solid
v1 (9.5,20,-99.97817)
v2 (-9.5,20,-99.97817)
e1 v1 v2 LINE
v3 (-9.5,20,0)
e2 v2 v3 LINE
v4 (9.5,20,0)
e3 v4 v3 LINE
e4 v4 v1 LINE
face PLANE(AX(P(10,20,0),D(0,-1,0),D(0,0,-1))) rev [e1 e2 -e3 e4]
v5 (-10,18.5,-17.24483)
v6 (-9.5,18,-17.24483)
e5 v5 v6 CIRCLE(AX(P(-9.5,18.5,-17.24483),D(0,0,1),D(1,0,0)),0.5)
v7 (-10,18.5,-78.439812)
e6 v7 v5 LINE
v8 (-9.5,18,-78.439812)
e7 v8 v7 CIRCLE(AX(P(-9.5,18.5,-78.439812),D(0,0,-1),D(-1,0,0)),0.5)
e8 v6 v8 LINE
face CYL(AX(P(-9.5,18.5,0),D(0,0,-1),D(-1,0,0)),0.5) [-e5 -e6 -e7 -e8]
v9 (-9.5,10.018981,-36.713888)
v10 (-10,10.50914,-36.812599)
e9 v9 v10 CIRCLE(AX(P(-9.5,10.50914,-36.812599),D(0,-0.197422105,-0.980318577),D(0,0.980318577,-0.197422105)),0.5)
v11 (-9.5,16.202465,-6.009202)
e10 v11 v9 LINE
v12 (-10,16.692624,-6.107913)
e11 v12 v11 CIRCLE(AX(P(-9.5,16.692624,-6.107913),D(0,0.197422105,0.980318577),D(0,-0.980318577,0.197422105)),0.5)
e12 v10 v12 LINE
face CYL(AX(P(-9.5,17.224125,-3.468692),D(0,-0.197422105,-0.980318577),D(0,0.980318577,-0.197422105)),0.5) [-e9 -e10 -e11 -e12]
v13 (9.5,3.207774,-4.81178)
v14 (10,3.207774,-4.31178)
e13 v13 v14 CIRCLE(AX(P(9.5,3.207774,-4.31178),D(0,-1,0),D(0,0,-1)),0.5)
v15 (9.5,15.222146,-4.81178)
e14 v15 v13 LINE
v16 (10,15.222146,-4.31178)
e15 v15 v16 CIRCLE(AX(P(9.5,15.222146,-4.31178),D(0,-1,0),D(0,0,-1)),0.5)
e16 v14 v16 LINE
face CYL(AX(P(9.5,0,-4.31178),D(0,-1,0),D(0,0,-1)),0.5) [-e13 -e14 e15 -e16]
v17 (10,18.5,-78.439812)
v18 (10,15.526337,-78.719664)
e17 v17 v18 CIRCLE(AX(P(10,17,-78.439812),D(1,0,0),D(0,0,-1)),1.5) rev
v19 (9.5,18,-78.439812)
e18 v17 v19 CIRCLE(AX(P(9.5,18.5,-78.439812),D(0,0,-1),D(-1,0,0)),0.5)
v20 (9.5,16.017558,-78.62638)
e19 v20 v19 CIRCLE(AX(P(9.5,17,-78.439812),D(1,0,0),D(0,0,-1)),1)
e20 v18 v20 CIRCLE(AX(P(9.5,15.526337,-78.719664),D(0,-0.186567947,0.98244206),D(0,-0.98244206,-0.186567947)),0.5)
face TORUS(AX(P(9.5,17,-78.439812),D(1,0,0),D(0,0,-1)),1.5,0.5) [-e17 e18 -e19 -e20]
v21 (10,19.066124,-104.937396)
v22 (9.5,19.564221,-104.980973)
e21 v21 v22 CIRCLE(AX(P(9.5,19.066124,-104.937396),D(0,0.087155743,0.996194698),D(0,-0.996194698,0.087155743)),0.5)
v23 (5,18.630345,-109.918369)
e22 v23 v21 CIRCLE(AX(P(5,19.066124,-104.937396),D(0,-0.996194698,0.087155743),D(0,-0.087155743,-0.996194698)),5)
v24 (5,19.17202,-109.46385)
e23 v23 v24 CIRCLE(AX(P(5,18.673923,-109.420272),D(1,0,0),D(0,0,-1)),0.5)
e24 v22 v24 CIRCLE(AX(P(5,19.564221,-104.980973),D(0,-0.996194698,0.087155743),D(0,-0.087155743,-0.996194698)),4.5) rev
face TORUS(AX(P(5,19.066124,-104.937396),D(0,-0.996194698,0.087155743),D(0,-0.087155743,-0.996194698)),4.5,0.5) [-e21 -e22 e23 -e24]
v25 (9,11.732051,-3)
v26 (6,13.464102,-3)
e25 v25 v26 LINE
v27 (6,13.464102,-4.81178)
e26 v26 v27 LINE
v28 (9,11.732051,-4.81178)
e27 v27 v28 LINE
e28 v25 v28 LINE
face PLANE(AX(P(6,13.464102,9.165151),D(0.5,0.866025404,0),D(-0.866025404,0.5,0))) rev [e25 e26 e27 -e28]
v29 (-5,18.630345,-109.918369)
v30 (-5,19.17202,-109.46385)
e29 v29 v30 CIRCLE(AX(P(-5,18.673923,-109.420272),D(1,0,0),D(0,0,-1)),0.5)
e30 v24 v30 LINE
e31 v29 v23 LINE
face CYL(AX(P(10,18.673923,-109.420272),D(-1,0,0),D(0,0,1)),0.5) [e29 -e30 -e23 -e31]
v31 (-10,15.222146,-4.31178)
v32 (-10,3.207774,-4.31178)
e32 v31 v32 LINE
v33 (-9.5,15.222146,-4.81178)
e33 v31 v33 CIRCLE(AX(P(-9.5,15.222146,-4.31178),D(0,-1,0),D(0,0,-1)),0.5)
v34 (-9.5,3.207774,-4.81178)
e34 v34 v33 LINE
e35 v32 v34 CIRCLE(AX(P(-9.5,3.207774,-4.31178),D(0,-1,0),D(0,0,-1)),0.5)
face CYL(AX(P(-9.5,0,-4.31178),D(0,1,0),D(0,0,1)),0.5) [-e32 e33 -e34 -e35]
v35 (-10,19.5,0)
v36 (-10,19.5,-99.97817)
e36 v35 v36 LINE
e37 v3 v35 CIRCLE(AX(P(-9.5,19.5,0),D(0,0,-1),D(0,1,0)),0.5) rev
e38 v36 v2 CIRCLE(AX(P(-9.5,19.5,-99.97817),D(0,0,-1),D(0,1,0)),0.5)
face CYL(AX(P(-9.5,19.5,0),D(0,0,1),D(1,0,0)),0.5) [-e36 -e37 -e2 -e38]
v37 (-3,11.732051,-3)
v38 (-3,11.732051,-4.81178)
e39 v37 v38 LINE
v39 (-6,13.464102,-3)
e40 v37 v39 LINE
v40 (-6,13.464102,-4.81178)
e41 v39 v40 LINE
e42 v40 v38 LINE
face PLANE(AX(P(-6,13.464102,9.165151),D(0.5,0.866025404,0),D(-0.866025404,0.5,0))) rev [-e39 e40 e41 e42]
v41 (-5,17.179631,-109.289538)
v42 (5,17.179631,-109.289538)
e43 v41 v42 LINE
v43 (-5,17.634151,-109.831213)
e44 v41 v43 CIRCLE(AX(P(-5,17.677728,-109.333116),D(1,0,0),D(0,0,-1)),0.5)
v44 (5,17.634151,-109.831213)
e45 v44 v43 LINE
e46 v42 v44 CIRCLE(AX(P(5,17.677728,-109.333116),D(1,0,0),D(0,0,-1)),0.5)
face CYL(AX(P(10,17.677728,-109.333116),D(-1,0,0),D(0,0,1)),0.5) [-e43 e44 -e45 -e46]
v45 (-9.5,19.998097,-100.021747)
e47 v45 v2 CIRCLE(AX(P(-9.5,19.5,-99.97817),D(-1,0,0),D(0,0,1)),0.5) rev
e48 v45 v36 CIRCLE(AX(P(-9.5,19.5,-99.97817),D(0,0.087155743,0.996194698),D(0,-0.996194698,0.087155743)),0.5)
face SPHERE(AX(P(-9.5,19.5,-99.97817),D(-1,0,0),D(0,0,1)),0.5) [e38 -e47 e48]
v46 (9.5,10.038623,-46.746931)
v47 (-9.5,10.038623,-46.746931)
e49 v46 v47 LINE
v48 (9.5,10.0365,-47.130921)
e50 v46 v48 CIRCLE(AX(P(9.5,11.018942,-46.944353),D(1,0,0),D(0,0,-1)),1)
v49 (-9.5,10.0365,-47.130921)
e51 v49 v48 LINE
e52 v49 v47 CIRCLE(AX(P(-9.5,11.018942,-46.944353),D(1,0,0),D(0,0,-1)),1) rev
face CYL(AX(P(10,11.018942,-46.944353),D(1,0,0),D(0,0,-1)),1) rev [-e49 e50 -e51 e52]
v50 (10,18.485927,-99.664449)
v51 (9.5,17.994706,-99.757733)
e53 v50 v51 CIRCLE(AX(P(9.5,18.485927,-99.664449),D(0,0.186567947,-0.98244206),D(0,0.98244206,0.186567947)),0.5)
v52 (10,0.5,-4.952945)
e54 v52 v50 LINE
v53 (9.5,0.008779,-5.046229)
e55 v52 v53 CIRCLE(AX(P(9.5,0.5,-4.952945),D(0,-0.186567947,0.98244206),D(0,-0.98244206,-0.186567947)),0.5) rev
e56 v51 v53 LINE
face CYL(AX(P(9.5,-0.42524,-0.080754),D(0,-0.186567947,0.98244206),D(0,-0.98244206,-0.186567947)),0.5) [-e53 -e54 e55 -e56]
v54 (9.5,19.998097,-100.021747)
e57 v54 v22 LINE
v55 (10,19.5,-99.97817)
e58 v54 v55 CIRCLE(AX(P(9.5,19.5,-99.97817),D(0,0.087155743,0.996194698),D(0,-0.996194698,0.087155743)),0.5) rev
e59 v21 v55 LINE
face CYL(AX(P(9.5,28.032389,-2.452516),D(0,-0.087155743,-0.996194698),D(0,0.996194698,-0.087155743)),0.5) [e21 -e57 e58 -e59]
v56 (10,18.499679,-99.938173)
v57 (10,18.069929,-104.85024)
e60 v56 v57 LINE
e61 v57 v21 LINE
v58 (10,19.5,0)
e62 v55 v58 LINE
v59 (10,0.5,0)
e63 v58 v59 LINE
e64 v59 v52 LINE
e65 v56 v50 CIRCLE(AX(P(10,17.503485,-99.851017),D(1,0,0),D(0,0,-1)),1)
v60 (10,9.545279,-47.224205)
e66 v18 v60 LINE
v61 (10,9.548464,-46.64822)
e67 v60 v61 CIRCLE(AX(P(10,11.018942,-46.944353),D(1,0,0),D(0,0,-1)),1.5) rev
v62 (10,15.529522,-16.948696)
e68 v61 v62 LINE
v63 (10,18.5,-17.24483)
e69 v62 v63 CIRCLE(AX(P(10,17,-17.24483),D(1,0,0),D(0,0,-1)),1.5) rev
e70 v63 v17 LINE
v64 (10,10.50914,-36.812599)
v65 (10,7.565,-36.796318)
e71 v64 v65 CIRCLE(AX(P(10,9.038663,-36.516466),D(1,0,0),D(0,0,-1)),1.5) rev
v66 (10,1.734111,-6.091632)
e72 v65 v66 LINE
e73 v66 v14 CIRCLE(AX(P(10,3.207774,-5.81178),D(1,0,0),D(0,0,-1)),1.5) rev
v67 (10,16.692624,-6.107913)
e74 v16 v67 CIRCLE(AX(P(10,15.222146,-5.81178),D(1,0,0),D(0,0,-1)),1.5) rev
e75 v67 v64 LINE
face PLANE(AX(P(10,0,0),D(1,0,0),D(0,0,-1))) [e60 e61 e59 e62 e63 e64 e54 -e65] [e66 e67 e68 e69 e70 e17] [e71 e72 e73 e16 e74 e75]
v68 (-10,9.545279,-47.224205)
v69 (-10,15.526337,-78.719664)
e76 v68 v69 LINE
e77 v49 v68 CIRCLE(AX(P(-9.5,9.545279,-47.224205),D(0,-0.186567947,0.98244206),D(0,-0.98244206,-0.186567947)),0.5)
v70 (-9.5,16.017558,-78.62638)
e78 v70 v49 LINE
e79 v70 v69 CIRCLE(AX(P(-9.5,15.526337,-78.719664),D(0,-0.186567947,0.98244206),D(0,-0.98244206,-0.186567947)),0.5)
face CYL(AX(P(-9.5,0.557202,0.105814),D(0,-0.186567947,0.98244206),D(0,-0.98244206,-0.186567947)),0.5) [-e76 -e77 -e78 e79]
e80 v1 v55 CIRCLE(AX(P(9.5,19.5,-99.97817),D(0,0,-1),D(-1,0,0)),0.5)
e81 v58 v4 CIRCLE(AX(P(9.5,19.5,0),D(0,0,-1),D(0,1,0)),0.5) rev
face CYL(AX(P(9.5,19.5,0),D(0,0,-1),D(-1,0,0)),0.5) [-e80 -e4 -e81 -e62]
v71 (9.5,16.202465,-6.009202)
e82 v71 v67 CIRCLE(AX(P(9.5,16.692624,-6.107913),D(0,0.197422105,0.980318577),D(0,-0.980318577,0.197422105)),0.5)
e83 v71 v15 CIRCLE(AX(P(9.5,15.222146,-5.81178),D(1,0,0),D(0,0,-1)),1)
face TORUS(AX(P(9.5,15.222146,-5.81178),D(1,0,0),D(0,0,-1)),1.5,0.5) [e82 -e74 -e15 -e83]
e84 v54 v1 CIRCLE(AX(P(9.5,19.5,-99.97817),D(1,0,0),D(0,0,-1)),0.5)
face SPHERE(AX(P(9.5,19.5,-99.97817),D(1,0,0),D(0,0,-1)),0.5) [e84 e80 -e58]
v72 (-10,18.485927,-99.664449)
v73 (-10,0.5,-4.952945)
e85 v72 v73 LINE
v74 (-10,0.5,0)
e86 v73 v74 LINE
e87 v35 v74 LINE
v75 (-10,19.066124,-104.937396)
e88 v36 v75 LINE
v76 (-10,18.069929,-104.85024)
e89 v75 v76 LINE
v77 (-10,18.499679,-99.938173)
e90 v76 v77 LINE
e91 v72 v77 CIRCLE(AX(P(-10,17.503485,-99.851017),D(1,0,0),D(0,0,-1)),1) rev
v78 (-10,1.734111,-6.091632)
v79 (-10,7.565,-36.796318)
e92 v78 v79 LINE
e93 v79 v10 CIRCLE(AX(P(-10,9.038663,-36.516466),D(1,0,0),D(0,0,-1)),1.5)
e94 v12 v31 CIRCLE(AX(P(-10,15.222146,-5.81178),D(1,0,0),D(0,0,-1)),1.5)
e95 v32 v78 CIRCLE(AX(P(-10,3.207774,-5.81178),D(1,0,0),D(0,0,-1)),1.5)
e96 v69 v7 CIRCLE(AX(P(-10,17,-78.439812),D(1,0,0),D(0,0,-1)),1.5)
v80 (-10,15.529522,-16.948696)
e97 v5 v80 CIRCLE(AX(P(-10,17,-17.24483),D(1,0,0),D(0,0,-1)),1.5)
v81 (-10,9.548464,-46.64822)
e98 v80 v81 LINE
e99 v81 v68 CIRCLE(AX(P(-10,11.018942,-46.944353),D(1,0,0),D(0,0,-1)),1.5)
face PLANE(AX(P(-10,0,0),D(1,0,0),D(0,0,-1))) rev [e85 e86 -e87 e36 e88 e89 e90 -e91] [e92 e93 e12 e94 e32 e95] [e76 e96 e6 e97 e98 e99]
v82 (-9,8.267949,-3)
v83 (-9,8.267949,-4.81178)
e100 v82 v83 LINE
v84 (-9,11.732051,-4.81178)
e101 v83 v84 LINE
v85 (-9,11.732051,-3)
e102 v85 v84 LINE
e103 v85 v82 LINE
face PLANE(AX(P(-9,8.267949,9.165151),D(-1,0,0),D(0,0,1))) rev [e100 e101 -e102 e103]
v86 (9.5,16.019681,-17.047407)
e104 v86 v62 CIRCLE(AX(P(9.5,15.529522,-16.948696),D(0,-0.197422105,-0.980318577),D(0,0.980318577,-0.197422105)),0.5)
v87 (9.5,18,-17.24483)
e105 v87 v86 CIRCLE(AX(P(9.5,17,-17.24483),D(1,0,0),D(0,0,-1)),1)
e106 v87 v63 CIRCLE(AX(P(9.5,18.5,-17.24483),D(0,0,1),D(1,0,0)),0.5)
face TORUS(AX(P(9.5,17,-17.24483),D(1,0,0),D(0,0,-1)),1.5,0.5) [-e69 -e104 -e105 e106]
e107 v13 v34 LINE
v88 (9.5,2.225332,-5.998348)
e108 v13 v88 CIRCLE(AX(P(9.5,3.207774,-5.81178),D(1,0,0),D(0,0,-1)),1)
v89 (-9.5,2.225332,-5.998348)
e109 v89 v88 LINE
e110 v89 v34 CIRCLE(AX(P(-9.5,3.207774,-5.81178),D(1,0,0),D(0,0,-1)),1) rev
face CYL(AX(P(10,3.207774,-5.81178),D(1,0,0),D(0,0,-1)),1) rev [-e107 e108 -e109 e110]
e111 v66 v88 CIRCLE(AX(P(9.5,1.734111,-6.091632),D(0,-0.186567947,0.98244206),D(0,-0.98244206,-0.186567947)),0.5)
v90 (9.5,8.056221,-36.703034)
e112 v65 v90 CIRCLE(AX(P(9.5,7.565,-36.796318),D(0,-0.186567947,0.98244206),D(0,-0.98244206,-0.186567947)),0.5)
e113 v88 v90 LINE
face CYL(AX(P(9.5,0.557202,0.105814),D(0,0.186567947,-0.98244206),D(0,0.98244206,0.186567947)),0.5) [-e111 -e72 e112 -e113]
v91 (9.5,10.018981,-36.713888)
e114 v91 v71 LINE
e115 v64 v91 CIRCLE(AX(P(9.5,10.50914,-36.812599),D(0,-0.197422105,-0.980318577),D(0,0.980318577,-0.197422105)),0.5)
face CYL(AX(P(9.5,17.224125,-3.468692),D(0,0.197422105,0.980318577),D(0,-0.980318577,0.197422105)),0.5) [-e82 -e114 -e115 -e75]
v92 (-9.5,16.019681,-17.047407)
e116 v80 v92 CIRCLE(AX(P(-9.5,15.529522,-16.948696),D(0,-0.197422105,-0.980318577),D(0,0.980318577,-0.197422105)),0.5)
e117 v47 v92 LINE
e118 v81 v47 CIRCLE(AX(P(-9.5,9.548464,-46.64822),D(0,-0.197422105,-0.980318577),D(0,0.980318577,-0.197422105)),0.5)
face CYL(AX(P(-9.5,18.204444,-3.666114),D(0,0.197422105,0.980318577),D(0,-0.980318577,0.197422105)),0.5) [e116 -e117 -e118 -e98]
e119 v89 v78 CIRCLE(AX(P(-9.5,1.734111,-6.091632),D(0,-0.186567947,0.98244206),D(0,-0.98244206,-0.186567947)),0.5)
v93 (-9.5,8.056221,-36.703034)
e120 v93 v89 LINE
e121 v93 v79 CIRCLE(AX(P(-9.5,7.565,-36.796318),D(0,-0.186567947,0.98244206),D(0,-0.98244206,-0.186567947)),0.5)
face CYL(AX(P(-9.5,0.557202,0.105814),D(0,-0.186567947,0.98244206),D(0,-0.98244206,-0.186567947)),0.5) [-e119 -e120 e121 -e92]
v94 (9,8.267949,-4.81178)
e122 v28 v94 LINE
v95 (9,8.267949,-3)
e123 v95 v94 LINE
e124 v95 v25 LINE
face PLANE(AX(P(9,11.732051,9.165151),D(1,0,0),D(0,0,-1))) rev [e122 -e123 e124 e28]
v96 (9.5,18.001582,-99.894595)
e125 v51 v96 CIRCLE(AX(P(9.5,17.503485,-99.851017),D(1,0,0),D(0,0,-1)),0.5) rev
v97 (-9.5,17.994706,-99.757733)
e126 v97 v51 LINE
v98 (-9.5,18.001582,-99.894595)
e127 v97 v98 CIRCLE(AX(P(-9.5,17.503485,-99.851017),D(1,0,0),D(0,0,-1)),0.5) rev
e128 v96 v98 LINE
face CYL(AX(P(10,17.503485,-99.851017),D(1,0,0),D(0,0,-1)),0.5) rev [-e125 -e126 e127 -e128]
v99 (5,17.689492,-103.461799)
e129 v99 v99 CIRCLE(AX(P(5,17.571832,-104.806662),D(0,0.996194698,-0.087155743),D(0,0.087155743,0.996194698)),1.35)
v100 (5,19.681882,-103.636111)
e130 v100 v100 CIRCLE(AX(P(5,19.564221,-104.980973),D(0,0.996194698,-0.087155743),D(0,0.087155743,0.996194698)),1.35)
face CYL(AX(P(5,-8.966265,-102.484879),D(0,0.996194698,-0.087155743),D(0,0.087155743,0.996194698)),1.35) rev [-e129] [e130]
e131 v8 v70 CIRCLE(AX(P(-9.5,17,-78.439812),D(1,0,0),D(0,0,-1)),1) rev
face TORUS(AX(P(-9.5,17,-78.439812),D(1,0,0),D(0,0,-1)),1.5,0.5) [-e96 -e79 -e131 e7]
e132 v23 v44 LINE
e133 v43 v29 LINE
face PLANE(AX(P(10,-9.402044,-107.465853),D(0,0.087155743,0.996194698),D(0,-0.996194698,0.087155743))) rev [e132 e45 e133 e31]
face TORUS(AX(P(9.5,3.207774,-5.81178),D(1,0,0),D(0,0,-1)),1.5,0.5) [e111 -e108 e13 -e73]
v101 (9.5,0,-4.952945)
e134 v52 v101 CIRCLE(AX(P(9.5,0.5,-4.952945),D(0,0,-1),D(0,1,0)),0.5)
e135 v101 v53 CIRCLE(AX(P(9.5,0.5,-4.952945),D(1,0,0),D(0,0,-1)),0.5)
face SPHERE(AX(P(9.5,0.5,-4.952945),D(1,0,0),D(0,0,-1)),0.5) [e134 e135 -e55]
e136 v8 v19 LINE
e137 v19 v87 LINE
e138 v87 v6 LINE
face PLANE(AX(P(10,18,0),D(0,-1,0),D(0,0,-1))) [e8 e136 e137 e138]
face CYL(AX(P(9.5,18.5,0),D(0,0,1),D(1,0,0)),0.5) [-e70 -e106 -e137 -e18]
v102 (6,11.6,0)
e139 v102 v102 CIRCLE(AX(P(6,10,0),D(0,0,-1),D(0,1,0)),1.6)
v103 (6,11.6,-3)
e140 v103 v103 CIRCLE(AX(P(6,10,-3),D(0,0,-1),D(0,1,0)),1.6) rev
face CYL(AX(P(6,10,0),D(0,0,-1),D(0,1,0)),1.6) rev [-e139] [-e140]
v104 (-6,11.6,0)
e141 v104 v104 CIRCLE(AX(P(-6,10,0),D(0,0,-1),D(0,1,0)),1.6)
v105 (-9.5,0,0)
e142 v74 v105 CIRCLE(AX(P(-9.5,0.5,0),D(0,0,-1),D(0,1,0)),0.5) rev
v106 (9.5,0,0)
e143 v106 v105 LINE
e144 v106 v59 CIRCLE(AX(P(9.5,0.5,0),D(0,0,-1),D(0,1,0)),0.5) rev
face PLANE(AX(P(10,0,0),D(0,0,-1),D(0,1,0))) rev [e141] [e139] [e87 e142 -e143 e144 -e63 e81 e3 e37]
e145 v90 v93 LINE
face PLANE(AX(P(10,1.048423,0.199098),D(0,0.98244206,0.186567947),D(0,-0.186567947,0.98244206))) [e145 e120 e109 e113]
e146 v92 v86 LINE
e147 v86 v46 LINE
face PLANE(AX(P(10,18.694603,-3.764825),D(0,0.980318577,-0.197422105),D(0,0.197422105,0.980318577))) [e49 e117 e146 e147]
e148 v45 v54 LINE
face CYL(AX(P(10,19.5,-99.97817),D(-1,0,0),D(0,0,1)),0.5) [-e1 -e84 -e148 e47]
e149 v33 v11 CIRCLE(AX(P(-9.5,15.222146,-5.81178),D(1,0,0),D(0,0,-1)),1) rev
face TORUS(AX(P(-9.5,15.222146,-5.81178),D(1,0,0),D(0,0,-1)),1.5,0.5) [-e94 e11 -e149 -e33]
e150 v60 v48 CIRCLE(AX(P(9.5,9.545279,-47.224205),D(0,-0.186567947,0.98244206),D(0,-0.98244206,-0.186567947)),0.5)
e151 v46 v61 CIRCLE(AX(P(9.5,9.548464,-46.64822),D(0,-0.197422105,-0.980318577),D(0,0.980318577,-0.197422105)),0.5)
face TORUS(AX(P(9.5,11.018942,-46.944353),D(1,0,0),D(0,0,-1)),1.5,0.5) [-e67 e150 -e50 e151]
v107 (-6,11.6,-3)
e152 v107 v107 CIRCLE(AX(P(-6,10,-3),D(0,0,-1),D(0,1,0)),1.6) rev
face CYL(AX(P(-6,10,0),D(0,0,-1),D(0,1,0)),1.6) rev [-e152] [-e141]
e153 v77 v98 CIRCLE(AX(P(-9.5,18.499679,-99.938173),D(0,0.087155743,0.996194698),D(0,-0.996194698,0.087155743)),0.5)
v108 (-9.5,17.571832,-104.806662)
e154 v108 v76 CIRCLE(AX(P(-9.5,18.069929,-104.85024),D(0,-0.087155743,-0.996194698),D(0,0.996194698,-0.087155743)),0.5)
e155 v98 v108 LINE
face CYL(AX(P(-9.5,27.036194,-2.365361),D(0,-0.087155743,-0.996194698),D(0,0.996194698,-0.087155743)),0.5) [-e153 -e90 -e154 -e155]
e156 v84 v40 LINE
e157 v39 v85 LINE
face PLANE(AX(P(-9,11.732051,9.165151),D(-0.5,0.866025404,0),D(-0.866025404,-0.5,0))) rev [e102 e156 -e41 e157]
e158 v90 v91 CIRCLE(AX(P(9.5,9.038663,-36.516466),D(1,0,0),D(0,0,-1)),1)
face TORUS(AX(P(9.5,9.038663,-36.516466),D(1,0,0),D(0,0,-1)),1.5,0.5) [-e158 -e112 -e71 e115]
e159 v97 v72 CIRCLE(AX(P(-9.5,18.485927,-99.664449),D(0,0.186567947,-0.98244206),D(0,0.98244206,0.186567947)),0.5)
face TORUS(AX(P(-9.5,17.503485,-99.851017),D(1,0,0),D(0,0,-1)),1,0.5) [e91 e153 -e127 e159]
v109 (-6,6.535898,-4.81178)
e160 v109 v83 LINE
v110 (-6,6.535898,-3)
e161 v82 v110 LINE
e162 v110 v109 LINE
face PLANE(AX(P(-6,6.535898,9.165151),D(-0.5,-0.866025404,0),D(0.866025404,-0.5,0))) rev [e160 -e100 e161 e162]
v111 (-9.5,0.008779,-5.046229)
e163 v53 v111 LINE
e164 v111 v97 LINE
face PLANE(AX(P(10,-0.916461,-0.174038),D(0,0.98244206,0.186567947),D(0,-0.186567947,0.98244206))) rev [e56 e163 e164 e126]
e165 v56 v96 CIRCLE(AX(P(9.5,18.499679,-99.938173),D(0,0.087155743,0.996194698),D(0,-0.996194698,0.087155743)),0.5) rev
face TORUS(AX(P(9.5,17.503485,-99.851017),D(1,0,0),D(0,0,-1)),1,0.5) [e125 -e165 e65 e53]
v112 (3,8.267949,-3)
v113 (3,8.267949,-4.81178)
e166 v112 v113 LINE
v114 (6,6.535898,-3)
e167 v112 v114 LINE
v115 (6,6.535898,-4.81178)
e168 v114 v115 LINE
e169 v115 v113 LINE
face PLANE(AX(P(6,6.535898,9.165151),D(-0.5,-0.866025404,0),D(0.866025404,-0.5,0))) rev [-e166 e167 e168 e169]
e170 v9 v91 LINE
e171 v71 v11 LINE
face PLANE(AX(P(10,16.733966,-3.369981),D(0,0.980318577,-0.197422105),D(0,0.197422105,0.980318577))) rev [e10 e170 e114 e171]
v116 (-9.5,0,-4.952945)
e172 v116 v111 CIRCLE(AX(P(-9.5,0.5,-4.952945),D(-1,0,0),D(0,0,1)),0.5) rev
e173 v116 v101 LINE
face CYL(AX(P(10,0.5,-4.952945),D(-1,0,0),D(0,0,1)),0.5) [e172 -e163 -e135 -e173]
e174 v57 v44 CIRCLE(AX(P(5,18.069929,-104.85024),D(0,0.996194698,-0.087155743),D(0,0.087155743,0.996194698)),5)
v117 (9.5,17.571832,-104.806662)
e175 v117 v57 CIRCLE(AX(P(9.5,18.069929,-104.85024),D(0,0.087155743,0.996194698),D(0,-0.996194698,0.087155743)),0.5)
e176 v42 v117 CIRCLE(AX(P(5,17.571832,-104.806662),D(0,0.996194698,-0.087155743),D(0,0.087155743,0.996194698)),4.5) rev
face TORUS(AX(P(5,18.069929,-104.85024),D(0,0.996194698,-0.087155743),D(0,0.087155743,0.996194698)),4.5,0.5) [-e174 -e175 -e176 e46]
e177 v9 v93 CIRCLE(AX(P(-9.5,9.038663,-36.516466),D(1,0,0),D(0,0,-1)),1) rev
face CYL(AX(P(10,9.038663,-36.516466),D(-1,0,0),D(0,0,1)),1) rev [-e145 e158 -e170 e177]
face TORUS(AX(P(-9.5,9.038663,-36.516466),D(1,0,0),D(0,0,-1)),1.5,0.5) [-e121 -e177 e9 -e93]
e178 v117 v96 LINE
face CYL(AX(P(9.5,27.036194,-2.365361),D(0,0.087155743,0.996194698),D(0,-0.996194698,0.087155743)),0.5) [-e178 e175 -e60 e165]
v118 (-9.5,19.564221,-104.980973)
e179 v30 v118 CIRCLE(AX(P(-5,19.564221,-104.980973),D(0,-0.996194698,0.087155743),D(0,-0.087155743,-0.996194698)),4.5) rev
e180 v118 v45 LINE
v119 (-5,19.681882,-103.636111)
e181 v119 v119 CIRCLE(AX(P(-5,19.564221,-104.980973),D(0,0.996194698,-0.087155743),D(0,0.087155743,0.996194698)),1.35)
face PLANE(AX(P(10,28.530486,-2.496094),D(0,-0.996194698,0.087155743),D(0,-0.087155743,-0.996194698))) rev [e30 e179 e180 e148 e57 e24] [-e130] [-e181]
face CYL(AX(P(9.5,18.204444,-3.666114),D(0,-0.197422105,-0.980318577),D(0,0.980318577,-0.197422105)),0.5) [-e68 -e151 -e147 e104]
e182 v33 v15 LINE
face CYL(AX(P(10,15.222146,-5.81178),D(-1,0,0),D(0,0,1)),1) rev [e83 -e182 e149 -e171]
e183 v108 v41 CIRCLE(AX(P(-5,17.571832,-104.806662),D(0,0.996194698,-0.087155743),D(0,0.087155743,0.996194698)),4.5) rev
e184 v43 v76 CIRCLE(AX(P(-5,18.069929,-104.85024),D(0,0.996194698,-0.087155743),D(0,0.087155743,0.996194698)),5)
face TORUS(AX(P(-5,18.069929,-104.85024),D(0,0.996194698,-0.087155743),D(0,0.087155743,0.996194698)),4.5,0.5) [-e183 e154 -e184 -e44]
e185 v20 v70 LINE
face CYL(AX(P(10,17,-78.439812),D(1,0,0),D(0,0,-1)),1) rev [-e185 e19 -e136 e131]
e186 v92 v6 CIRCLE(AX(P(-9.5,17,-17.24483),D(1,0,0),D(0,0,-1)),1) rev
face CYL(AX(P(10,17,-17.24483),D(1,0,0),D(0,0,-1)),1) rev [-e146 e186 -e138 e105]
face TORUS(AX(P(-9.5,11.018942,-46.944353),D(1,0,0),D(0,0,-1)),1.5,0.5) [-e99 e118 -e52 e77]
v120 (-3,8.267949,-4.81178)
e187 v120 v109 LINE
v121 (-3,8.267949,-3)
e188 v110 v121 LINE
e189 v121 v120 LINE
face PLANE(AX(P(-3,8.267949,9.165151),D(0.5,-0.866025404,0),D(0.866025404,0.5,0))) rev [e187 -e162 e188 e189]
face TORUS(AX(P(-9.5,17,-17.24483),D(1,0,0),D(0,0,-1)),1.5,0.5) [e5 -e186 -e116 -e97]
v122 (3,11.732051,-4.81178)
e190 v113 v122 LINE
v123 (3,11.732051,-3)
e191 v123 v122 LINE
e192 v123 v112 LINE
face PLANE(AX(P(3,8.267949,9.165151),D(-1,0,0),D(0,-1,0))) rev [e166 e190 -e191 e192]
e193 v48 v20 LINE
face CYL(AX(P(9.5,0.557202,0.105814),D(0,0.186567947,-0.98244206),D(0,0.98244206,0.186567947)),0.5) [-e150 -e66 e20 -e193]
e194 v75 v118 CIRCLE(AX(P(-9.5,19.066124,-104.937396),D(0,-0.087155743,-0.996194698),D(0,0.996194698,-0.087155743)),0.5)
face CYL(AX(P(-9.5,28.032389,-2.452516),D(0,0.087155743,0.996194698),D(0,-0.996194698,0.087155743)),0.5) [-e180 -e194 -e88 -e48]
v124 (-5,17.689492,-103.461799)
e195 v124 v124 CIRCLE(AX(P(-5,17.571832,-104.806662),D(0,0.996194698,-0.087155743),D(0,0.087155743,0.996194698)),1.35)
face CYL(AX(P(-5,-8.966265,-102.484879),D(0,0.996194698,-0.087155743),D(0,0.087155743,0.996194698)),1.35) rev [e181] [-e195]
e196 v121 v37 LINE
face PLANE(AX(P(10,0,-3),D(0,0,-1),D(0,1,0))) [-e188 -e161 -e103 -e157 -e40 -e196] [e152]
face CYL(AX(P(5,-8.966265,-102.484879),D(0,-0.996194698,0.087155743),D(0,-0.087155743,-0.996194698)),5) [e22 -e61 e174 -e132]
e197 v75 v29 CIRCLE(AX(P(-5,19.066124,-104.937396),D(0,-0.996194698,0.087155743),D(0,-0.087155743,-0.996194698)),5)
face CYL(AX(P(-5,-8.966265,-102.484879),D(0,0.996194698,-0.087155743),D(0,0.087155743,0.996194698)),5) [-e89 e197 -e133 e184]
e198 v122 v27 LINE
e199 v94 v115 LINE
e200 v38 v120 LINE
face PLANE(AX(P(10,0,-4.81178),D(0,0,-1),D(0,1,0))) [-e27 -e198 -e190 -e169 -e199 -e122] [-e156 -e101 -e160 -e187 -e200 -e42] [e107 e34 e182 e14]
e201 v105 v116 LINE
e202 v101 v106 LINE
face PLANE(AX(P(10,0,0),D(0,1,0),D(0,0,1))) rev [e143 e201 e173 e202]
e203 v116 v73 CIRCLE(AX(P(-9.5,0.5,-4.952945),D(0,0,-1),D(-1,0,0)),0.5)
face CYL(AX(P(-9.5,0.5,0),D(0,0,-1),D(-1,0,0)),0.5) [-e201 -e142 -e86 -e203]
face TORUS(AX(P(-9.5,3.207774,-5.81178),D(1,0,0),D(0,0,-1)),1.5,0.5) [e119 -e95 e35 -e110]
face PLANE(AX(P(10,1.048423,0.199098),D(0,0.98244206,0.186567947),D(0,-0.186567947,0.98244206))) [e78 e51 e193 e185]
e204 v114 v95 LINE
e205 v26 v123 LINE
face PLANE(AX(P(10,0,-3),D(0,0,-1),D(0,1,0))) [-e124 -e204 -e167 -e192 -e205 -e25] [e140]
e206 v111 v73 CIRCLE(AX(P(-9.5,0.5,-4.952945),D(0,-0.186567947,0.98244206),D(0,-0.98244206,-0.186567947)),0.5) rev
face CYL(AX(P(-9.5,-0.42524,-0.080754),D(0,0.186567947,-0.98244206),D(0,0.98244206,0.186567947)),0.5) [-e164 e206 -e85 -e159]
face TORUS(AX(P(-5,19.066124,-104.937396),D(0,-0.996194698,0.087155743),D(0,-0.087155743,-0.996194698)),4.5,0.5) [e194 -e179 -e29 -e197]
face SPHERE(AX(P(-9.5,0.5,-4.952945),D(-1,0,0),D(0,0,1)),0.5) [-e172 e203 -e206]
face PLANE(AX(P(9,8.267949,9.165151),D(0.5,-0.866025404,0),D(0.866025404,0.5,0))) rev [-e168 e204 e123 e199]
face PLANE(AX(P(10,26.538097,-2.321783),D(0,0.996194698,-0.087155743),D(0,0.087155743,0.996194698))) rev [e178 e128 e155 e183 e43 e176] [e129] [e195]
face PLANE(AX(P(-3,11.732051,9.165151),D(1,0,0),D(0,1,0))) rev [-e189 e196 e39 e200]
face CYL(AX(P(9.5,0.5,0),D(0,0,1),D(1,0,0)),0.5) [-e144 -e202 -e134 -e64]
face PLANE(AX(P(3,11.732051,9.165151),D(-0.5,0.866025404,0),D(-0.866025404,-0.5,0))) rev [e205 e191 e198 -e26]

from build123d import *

# Parameters (mm, degrees)
BOSS_EXTRUDE1_DEPTH = 10
FILLET1_R           = 1
SKETCH2_R           = 1.350000000000004
CUT_EXTRUDE1_DEPTH  = 112.63735120832646
FILLET2_R           = 5
FILLET3_R           = 0.5
SKETCH3_R           = 1.6
CUT_EXTRUDE2_DEPTH  = 108.46066783767205
SKETCH3_3_R         = 1.6
CUT_EXTRUDE3_DEPTH  = 1.811779672


with BuildPart() as part:
    # Sketch1 → Boss-Extrude1 (new, symmetric)
    with BuildSketch(Plane(origin=(0, 0, 0), x_dir=(0, 0, -1), z_dir=(1, 0, 0))):
        Polygon((5, 0), (99.82568851450469, 18.00761060381651), (109.78763549542214, 17.136053176339928), (109.96194698091746, 19.128442572523415), (100, 20), (0, 20), (0, 0), align=None)
        Polygon((7.213943781132286, 18.000000000000004), (89.06565708049523, 18.000000000000004), (46.93871837629756, 10), align=None, mode=Mode.SUBTRACT)
        Polygon((4.811779672099927, 2), (4.811779672099926, 16.443608291167273), (41.724774595165265, 9.00986039973272), align=None, mode=Mode.SUBTRACT)
    extrude(amount=BOSS_EXTRUDE1_DEPTH, both=True)

    # Fillet1
    fillet1_edges = [part.edges().sort_by_distance(p)[0] for p in [
        (0, 10, -46.93871837629756),
        (0, 18.000000000000004, -89.06565708049523),
        (0, 18, -7.213943781132289),
        (0, 2, -4.811779672099927),
        (0, 9.009860399732721, -41.72477459516527),
        (0, 16.443608291167273, -4.811779672099927),
    ]]
    fillet(fillet1_edges, radius=FILLET1_R)

    # Sketch2 → Cut-Extrude1 (cut, through all)
    with BuildSketch(Plane(origin=(0, 28.530486413468626, -2.4960941260589085), x_dir=(1, 0, 0), z_dir=(0, 0.9961946980917455, -0.08715574274765775))):
        with Locations(Location((-5.000000000000002, 102.87635495422138, 0), (0, 0, 270))):
            Circle(SKETCH2_R)
        with Locations(Location((4.999999999999998, 102.87635495422138, 0), (0, 0, 270))):
            Circle(SKETCH2_R)
    extrude(amount=-CUT_EXTRUDE1_DEPTH, mode=Mode.SUBTRACT)

    # Fillet2
    fillet2_edges = [part.edges().sort_by_distance(p)[0] for p in [
        (-10, 18.13224787443167, -109.87479123816979),
        (10, 18.13224787443167, -109.87479123816979),
    ]]
    fillet(fillet2_edges, radius=FILLET2_R)

    # Fillet3
    # the kernel refuses this fillet: 0.5 mm, written as the material it adds along each edge
    with BuildSketch(Plane(origin=(-10, 18.00761060381651, -99.82568851450469), x_dir=(0, -0.08715574274767855, -0.9961946980917438), z_dir=(1, 0, 0))) as fillet3_piece_1:
        with BuildLine():
            CenterArc((FILLET3_R * 0.138339535501, -FILLET3_R), FILLET3_R, 90.00000000000139, 15.752560883569203)
            Line((-FILLET3_R * 0.133143931847, -FILLET3_R * 0.0375568967694), (0, 0))
            Line((0, 0), (FILLET3_R * 0.138339535501, 0))
        make_face()
    extrude(amount=20)
    # the kernel refuses this fillet: 0.5 mm, written as the material it takes off along each edge
    with BuildSketch(Plane(origin=(-9.5, 19.5, -99.97816952854573), x_dir=(0, 0.9961946980917455, -0.08715574274765844), z_dir=(-1, 0, 0))) as fillet3_2_piece_1_section:
        Polygon((0, 0), (FILLET3_R, 0), (FILLET3_R, -FILLET3_R * 0.0436609429085), (FILLET3_R * 0.996194698092, -FILLET3_R * 0.0871557427477), align=None)
    fillet3_2_piece_1 = extrude(amount=FILLET3_R, mode=Mode.PRIVATE)
    fillet3_2_piece_1 = fillet3_2_piece_1 - Plane(origin=(-9.5, 19.5, -99.97816952854573), x_dir=(0, -0.9990482215818577, 0.04361938736533613), z_dir=(-1, 0, 0)) * Sphere(FILLET3_R, mode=Mode.PRIVATE)
    add(fillet3_2_piece_1, mode=Mode.SUBTRACT)
    with BuildSketch(Plane(origin=(-9.5, 0.5000000000000001, -4.952944918024983), x_dir=(0, -0.9824420598938401, -0.18656794727805787), z_dir=(-1, 0, 0))) as fillet3_2_piece_2_section:
        Polygon((0, 0), (FILLET3_R, 0), (FILLET3_R, FILLET3_R * 0.09411016395), (FILLET3_R * 0.982442059894, FILLET3_R * 0.186567947278), align=None)
    fillet3_2_piece_2 = extrude(amount=FILLET3_R, mode=Mode.PRIVATE)
    fillet3_2_piece_2 = fillet3_2_piece_2 - Plane(origin=(-9.5, 0.5000000000000001, -4.952944918024983), x_dir=(0, 0.9956008386632266, 0.09369615815539034), z_dir=(-1, 0, 0)) * Sphere(FILLET3_R, mode=Mode.PRIVATE)
    add(fillet3_2_piece_2, mode=Mode.SUBTRACT)
    with BuildSketch(Plane(origin=(9.5, 19.5, -99.97816952854575), x_dir=(0, 0.9961946980917455, -0.08715574274765844), z_dir=(1, 0, 0))) as fillet3_2_piece_3_section:
        Polygon((0, 0), (FILLET3_R, 0), (FILLET3_R, FILLET3_R * 0.0436609429085), (FILLET3_R * 0.996194698092, FILLET3_R * 0.0871557427477), align=None)
    fillet3_2_piece_3 = extrude(amount=FILLET3_R, mode=Mode.PRIVATE)
    fillet3_2_piece_3 = fillet3_2_piece_3 - Plane(origin=(9.5, 19.5, -99.97816952854575), x_dir=(0, -0.9990482215818577, 0.04361938736533613), z_dir=(1, 0, 0)) * Sphere(FILLET3_R, mode=Mode.PRIVATE)
    add(fillet3_2_piece_3, mode=Mode.SUBTRACT)
    with BuildSketch(Plane(origin=(9.5, 0.5, -4.952944918024983), x_dir=(0, -0.9824420598938401, -0.18656794727805787), z_dir=(1, 0, 0))) as fillet3_2_piece_4_section:
        Polygon((0, 0), (FILLET3_R, 0), (FILLET3_R, -FILLET3_R * 0.09411016395), (FILLET3_R * 0.982442059894, -FILLET3_R * 0.186567947278), align=None)
    fillet3_2_piece_4 = extrude(amount=FILLET3_R, mode=Mode.PRIVATE)
    fillet3_2_piece_4 = fillet3_2_piece_4 - Plane(origin=(9.5, 0.5, -4.952944918024983), x_dir=(0, 0.9956008386632266, 0.09369615815539034), z_dir=(1, 0, 0)) * Sphere(FILLET3_R, mode=Mode.PRIVATE)
    add(fillet3_2_piece_4, mode=Mode.SUBTRACT)
    with BuildSketch(Plane(origin=(-10, 20, -99.97816952854573), x_dir=(1, 0, 0), z_dir=(0, 0, 1))) as fillet3_2_piece_5:
        with BuildLine():
            CenterArc((FILLET3_R, -FILLET3_R), FILLET3_R, 90, 90)
            Line((0, -FILLET3_R), (0, 0))
            Line((0, 0), (FILLET3_R, 0))
        make_face()
    extrude(amount=101.22816952854573, mode=Mode.SUBTRACT)
    with BuildSketch(Plane(origin=(-10, 18.001582061332513, -99.89459507040617), x_dir=(1, 0, 0), z_dir=(0, -0.08715574274765822, -0.9961946980917455))) as fillet3_2_piece_6:
        with BuildLine():
            CenterArc((FILLET3_R, -FILLET3_R), FILLET3_R, 90, 90)
            Line((0, -FILLET3_R), (0, 0))
            Line((0, 0), (FILLET3_R, 0))
        make_face()
    extrude(amount=4.930830232249302, mode=Mode.SUBTRACT)
    with BuildSketch(Plane(origin=(-10, 0.00877897005308004, -5.046228891664011), x_dir=(1, -2.3e-16, -4e-17), z_dir=(0, 0.18656794727805787, -0.9824420598938401))) as fillet3_2_piece_7:
        with BuildLine():
            CenterArc((FILLET3_R, -FILLET3_R), FILLET3_R, 89.99999999999999, 90.00000000000001)
            Line((-1.2e-16, -FILLET3_R), (0, 0))
            Line((0, 0), (FILLET3_R, 0))
        make_face()
    extrude(amount=96.40416285105255, mode=Mode.SUBTRACT)
    with BuildSketch(Plane(origin=(-10, 0, 1.25), x_dir=(1, 0, 0), z_dir=(0, 0, -1))) as fillet3_2_piece_8:
        with BuildLine():
            CenterArc((FILLET3_R, -FILLET3_R), FILLET3_R, 90, 90)
            Line((0, -FILLET3_R), (0, 0))
            Line((0, 0), (FILLET3_R, 0))
        make_face()
    extrude(amount=6.202944918024983, mode=Mode.SUBTRACT)
    with BuildSketch(Plane(origin=(9.5, 20, -100), x_dir=(0, -0.08715574274762666, -0.9961946980917483), z_dir=(-1, 0, 0))) as fillet3_2_piece_9:
        with BuildLine():
            CenterArc((FILLET3_R * 0.0436609429085, FILLET3_R), FILLET3_R, 265.0000000000034, 4.999999999998181)
            Line((-FILLET3_R * 0.0434947998391, FILLET3_R * 0.00380530190825), (0, 0))
            Line((0, 0), (FILLET3_R * 0.0436609429085, 0))
        make_face()
    extrude(amount=19, mode=Mode.SUBTRACT)
    with BuildSketch(Plane(origin=(-9.5, 0, -5), x_dir=(0, 0.1865679472780554, -0.9824420598938406), z_dir=(1, 0, 0))) as fillet3_2_piece_10:
        with BuildLine():
            CenterArc((FILLET3_R * 0.09411016395, FILLET3_R), FILLET3_R, 259.24743911643094, 10.752560883569117)
            Line((-FILLET3_R * 0.092457783328, FILLET3_R * 0.0175579401062), (0, 0))
            Line((0, 0), (FILLET3_R * 0.09411016395, 0))
        make_face()
    extrude(amount=19, mode=Mode.SUBTRACT)
    with BuildSketch(Plane(origin=(10, 0, 1.25), x_dir=(0, 1, 0), z_dir=(0, 0, -1))) as fillet3_2_piece_11:
        with BuildLine():
            CenterArc((FILLET3_R, -FILLET3_R), FILLET3_R, 90, 90)
            Line((0, -FILLET3_R), (0, 0))
            Line((0, 0), (FILLET3_R, 0))
        make_face()
    extrude(amount=6.202944918024983, mode=Mode.SUBTRACT)
    with BuildSketch(Plane(origin=(10, 0.00877897005308067, -5.046228891664015), x_dir=(0, 0.9824420598938401, 0.18656794727805787), z_dir=(0, 0.18656794727805787, -0.9824420598938401))) as fillet3_2_piece_12:
        with BuildLine():
            CenterArc((FILLET3_R, -FILLET3_R), FILLET3_R, 90, 90)
            Line((-1.8e-16, -FILLET3_R), (0, 0))
            Line((0, 0), (FILLET3_R, 0))
        make_face()
    extrude(amount=96.40416285105255, mode=Mode.SUBTRACT)
    with BuildSketch(Plane(origin=(-10, 16.017557940106208, -78.62638018777407), x_dir=(1, 0, 0), z_dir=(0, -0.18656794727805784, 0.9824420598938403))) as fillet3_2_piece_13:
        with BuildLine():
            CenterArc((FILLET3_R, -FILLET3_R), FILLET3_R, 90, 90)
            Line((0, -FILLET3_R), (0, 0))
            Line((0, 0), (FILLET3_R, 0))
        make_face()
    extrude(amount=32.05833743733548, mode=Mode.SUBTRACT)
    with BuildSketch(Plane(origin=(10, 16.017557940106208, -78.62638018777407), x_dir=(0, -0.9824420598938401, -0.18656794727805784), z_dir=(0, -0.18656794727805784, 0.9824420598938403))) as fillet3_2_piece_14:
        with BuildLine():
            CenterArc((FILLET3_R, -FILLET3_R), FILLET3_R, 90, 90)
            Line((0, -FILLET3_R), (0, 0))
            Line((0, 0), (FILLET3_R, 0))
        make_face()
    extrude(amount=32.05833743733548, mode=Mode.SUBTRACT)
    with BuildSketch(Plane(origin=(-10, 18.000000000000004, -17.244829523491784), x_dir=(1, 0, 0), z_dir=(0, 0, -1)), Plane(origin=(10, 18.000000000000004, -17.244829523491784), x_dir=(0, 1, 0), z_dir=(0, 0, -1))) as fillet3_2_piece_15:
        with BuildLine():
            CenterArc((FILLET3_R, -FILLET3_R), FILLET3_R, 90, 90)
            Line((0, -FILLET3_R), (0, 0))
            Line((0, 0), (FILLET3_R, 0))
        make_face()
    extrude(amount=61.19498271700424, mode=Mode.SUBTRACT)
    with BuildSketch(Plane(origin=(10, 18.001582061332513, -99.89459507040617), x_dir=(0, 0.9961946980917457, -0.08715574274765824), z_dir=(0, -0.08715574274765822, -0.9961946980917455))) as fillet3_2_piece_16:
        with BuildLine():
            CenterArc((FILLET3_R, -FILLET3_R), FILLET3_R, 90, 90)
            Line((0, -FILLET3_R), (0, 0))
            Line((0, 0), (FILLET3_R, 0))
        make_face()
    extrude(amount=4.930830232249302, mode=Mode.SUBTRACT)
    with BuildSketch(Plane(origin=(-10, 10.038623214121019, -46.746931066910264), x_dir=(1, 0, 0), z_dir=(0, 0.19742210487806974, 0.9803185770480495))) as fillet3_2_piece_17:
        with BuildLine():
            CenterArc((FILLET3_R, -FILLET3_R), FILLET3_R, 90, 90)
            Line((0, -FILLET3_R), (0, 0))
            Line((0, 0), (FILLET3_R, 0))
        make_face()
    extrude(amount=30.29578786288863, mode=Mode.SUBTRACT)
    with BuildSketch(Plane(origin=(10, 10.038623214121019, -46.746931066910264), x_dir=(0, -0.9803185770480495, 0.19742210487806974), z_dir=(0, 0.19742210487806974, 0.9803185770480495))) as fillet3_2_piece_18:
        with BuildLine():
            CenterArc((FILLET3_R, -FILLET3_R), FILLET3_R, 90, 90)
            Line((0, -FILLET3_R), (0, 0))
            Line((0, 0), (FILLET3_R, 0))
        make_face()
    extrude(amount=30.29578786288863, mode=Mode.SUBTRACT)
    with BuildSketch(Plane(origin=(-10, 8.05622053074067, -36.70303355680187), x_dir=(1, 0, 0), z_dir=(0, -0.18656794727805792, 0.9824420598938403))) as fillet3_2_piece_19:
        with BuildLine():
            CenterArc((FILLET3_R, -FILLET3_R), FILLET3_R, 90, 90)
            Line((0, -FILLET3_R), (0, 0))
            Line((0, 0), (FILLET3_R, 0))
        make_face()
    extrude(amount=31.253431821456985, mode=Mode.SUBTRACT)
    with BuildSketch(Plane(origin=(10, 8.05622053074067, -36.70303355680187), x_dir=(0, -0.9824420598938401, -0.18656794727805792), z_dir=(0, -0.18656794727805792, 0.9824420598938403))) as fillet3_2_piece_20:
        with BuildLine():
            CenterArc((FILLET3_R, -FILLET3_R), FILLET3_R, 90, 90)
            Line((0, -FILLET3_R), (0, 0))
            Line((0, 0), (FILLET3_R, 0))
        make_face()
    extrude(amount=31.253431821456985, mode=Mode.SUBTRACT)
    with BuildSketch(Plane(origin=(-10, 16.202464648776655, -6.009201776977991), x_dir=(1, 3.4e-16, -7e-17), z_dir=(0, -0.19742210487806977, -0.9803185770480495))) as fillet3_2_piece_21:
        with BuildLine():
            CenterArc((FILLET3_R, -FILLET3_R), FILLET3_R, 90.00000000000003, 89.99999999999994)
            Line((1.8e-16, -FILLET3_R), (0, 0))
            Line((0, 0), (FILLET3_R, 0))
        make_face()
    extrude(amount=31.321130351199017, mode=Mode.SUBTRACT)
    with BuildSketch(Plane(origin=(10, 16.202464648776655, -6.009201776977991), x_dir=(0, 0.9803185770480494, -0.19742210487806977), z_dir=(0, -0.19742210487806977, -0.9803185770480495))) as fillet3_2_piece_22:
        with BuildLine():
            CenterArc((FILLET3_R, -FILLET3_R), FILLET3_R, 90, 90)
            Line((1.8e-16, -FILLET3_R), (0, 0))
            Line((0, 0), (FILLET3_R, 0))
        make_face()
    extrude(amount=31.321130351199017, mode=Mode.SUBTRACT)
    with BuildSketch(Plane(origin=(-10, 3.2077739703105497, -4.811779672099927), x_dir=(1, 0, 0), z_dir=(0, 1, 6e-17))) as fillet3_2_piece_23:
        with BuildLine():
            CenterArc((FILLET3_R, -FILLET3_R), FILLET3_R, 90, 89.9999999999996)
            Line((0, -FILLET3_R), (0, 0))
            Line((0, 0), (FILLET3_R, 0))
        make_face()
    extrude(amount=12.01437210141806, mode=Mode.SUBTRACT)
    with BuildSketch(Plane(origin=(10, 3.2077739703105497, -4.811779672099927), x_dir=(0, -6e-17, 1), z_dir=(0, 1, 6e-17))) as fillet3_2_piece_24:
        with BuildLine():
            CenterArc((FILLET3_R, -FILLET3_R), FILLET3_R, 90, 90)
            Line((-3.55e-15, -FILLET3_R), (0, 0))
            Line((0, 0), (FILLET3_R, 0))
        make_face()
    extrude(amount=12.01437210141806, mode=Mode.SUBTRACT)
    with BuildSketch(Plane(origin=(-10, 17.000000000000007, -78.43981224049602), x_dir=(0, -0.982442059893839, -0.1865679472780643), z_dir=(0, -0.1865679472780643, 0.982442059893839))) as fillet3_2_piece_25:
        with BuildLine():
            CenterArc((0.9999999999999992 + FILLET3_R, FILLET3_R), FILLET3_R, 180, 89.9999999999996)
            Line((0.9999999999999992 + FILLET3_R, 0), (0.9999999999999992, 0))
            Line((0.9999999999999992, 0), (1.0000000000000029, FILLET3_R))
        make_face()
    revolve(axis=Axis((-10, 17.000000000000007, -78.43981224049602), (1, 0, 0)), revolution_arc=169.24743911643034, mode=Mode.SUBTRACT)
    with BuildSketch(Plane(origin=(10, 17.000000000000007, -78.43981224049602), x_dir=(0, -0.982442059893839, -0.1865679472780643), z_dir=(0, -0.1865679472780643, 0.982442059893839))) as fillet3_2_piece_26:
        with BuildLine():
            CenterArc((0.9999999999999992 + FILLET3_R, -FILLET3_R), FILLET3_R, 90, 90)
            Line((0.9999999999999992, -FILLET3_R), (0.9999999999999992, 0))
            Line((0.9999999999999992, 0), (0.9999999999999992 + FILLET3_R, 0))
        make_face()
    revolve(axis=Axis((10, 17.000000000000007, -78.43981224049602), (1, 0, 0)), revolution_arc=169.24743911643034, mode=Mode.SUBTRACT)
    with BuildSketch(Plane(origin=(-10, 11.018941791169059, -46.944353171788336), x_dir=(0, -0.980318577048049, 0.19742210487807202), z_dir=(0, 0.19742210487807202, 0.980318577048049))) as fillet3_2_piece_27:
        with BuildLine():
            CenterArc((1 + FILLET3_R, FILLET3_R), FILLET3_R, 180, 89.99999999999983)
            Line((1 + FILLET3_R, 0), (1, 0))
            Line((1, 0), (1.0000000000000013, FILLET3_R))
        make_face()
    revolve(axis=Axis((-10, 11.018941791169059, -46.944353171788336), (1, 0, 0)), revolution_arc=22.138811957945123, mode=Mode.SUBTRACT)
    with BuildSketch(Plane(origin=(10, 11.018941791169059, -46.944353171788336), x_dir=(0, -0.980318577048049, 0.19742210487807202), z_dir=(0, 0.19742210487807202, 0.980318577048049))) as fillet3_2_piece_28:
        with BuildLine():
            CenterArc((1 + FILLET3_R, -FILLET3_R), FILLET3_R, 90, 90)
            Line((0.9999999999999997, -FILLET3_R), (1, 0))
            Line((1, 0), (1 + FILLET3_R, 0))
        make_face()
    revolve(axis=Axis((10, 11.018941791169059, -46.944353171788336), (1, 0, 0)), revolution_arc=22.138811957945123, mode=Mode.SUBTRACT)
    with BuildSketch(Plane(origin=(-10, 9.038662590634502, -36.51646560952381), x_dir=(0, 0.9803185770480476, -0.19742210487807918), z_dir=(0, 0.19742210487807918, 0.9803185770480476))) as fillet3_2_piece_29:
        with BuildLine():
            CenterArc((0.9999999999999997 + FILLET3_R, -FILLET3_R), FILLET3_R, 90.00000000000016, 89.99999999999983)
            Line((0.9999999999999997 + FILLET3_R, 0), (0.9999999999999997, 0))
            Line((0.9999999999999997, 0), (1.000000000000001, -FILLET3_R))
        make_face()
    revolve(axis=Axis((-10, 9.038662590634502, -36.51646560952381), (-1, 0, 0)), revolution_arc=157.86118804205444, mode=Mode.SUBTRACT)
    with BuildSketch(Plane(origin=(10, 9.038662590634502, -36.51646560952381), x_dir=(0, 0.9803185770480476, -0.19742210487807918), z_dir=(0, 0.19742210487807918, 0.9803185770480476))) as fillet3_2_piece_30:
        with BuildLine():
            CenterArc((0.9999999999999997 + FILLET3_R, FILLET3_R), FILLET3_R, 180, 90)
            Line((0.9999999999999993, FILLET3_R), (0.9999999999999997, 0))
            Line((0.9999999999999997, 0), (0.9999999999999997 + FILLET3_R, 0))
        make_face()
    revolve(axis=Axis((10, 9.038662590634502, -36.51646560952381), (-1, 0, 0)), revolution_arc=157.86118804205444, mode=Mode.SUBTRACT)
    with BuildSketch(Plane(origin=(-10, 17.000000000000025, -17.244829523491784), x_dir=(0, -0.9803185770480497, 0.1974221048780686), z_dir=(0, -0.1974221048780686, -0.9803185770480497))) as fillet3_2_piece_31:
        with BuildLine():
            CenterArc((0.9999999999999993 + FILLET3_R, -FILLET3_R), FILLET3_R, 90, 90)
            Line((0.9999999999999993 + FILLET3_R, 0), (0.9999999999999993, 0))
            Line((0.9999999999999993, 0), (0.9999999999999993, -FILLET3_R))
        make_face()
    revolve(axis=Axis((-10, 17.000000000000025, -17.244829523491784), (-1, 0, 0)), revolution_arc=168.61374892562438, mode=Mode.SUBTRACT)
    with BuildSketch(Plane(origin=(10, 17.000000000000025, -17.244829523491784), x_dir=(0, -0.9803185770480497, 0.1974221048780686), z_dir=(0, -0.1974221048780686, -0.9803185770480497))) as fillet3_2_piece_32:
        with BuildLine():
            CenterArc((0.9999999999999993 + FILLET3_R, FILLET3_R), FILLET3_R, 180, 90)
            Line((0.9999999999999993, FILLET3_R), (0.9999999999999993, 0))
            Line((0.9999999999999993, 0), (0.9999999999999993 + FILLET3_R, 0))
        make_face()
    revolve(axis=Axis((10, 17.000000000000025, -17.244829523491784), (-1, 0, 0)), revolution_arc=168.61374892562438, mode=Mode.SUBTRACT)
    with BuildSketch(Plane(origin=(-10, 15.22214607172861, -5.811779672099926), x_dir=(0, 0.9803185770480494, -0.1974221048780703), z_dir=(0, -0.1974221048780703, -0.9803185770480494))) as fillet3_2_piece_33:
        with BuildLine():
            CenterArc((0.9999999999999997 + FILLET3_R, FILLET3_R), FILLET3_R, 180, 90)
            Line((0.9999999999999997 + FILLET3_R, 0), (0.9999999999999997, 0))
            Line((0.9999999999999997, 0), (0.9999999999999997, FILLET3_R))
        make_face()
    revolve(axis=Axis((-10, 15.22214607172861, -5.811779672099926), (1, 0, 0)), revolution_arc=101.38625107437593, mode=Mode.SUBTRACT)
    with BuildSketch(Plane(origin=(10, 15.22214607172861, -5.811779672099926), x_dir=(0, 0.9803185770480494, -0.1974221048780703), z_dir=(0, -0.1974221048780703, -0.9803185770480494))) as fillet3_2_piece_34:
        with BuildLine():
            CenterArc((0.9999999999999997 + FILLET3_R, -FILLET3_R), FILLET3_R, 90, 90)
            Line((0.9999999999999997, -FILLET3_R), (0.9999999999999997, 0))
            Line((0.9999999999999997, 0), (0.9999999999999997 + FILLET3_R, 0))
        make_face()
    revolve(axis=Axis((10, 15.22214607172861, -5.811779672099926), (1, 0, 0)), revolution_arc=101.38625107437593, mode=Mode.SUBTRACT)
    with BuildSketch(Plane(origin=(-10, 3.2077739703105497, -5.8117796720999255), x_dir=(0, 0, 1), z_dir=(0, 1, 0))) as fillet3_2_piece_35:
        with BuildLine():
            CenterArc((1 + FILLET3_R, FILLET3_R), FILLET3_R, 180, 90.00000000000023)
            Line((1 + FILLET3_R, 0), (1, 0))
            Line((1, 0), (1, FILLET3_R))
        make_face()
    revolve(axis=Axis((-10, 3.2077739703105497, -5.8117796720999255), (1, 0, 0)), revolution_arc=100.75256088356903, mode=Mode.SUBTRACT)
    with BuildSketch(Plane(origin=(10, 20, -99.97816952854575), x_dir=(0, -1, 0), z_dir=(0, 0, 1))) as fillet3_2_piece_36:
        with BuildLine():
            CenterArc((FILLET3_R, -FILLET3_R), FILLET3_R, 90, 90)
            Line((0, -FILLET3_R), (0, 0))
            Line((0, 0), (FILLET3_R, 0))
        make_face()
    extrude(amount=101.22816952854575, mode=Mode.SUBTRACT)
    with BuildSketch(Plane(origin=(10, 3.2077739703105497, -5.8117796720999255), x_dir=(0, 0, 1), z_dir=(0, 1, 0))) as fillet3_2_piece_37:
        with BuildLine():
            CenterArc((1 + FILLET3_R, -FILLET3_R), FILLET3_R, 90, 90)
            Line((1.0000000000000018, -FILLET3_R), (1, 0))
            Line((1, 0), (1 + FILLET3_R, 0))
        make_face()
    revolve(axis=Axis((10, 3.2077739703105497, -5.8117796720999255), (1, 0, 0)), revolution_arc=100.75256088356903, mode=Mode.SUBTRACT)
    with BuildSketch(Plane(origin=(5.000000000000001, 19.128442572523415, -109.96194698091746), x_dir=(0, 0.08715574274765829, 0.9961946980917454), z_dir=(-1, 0, 0))) as fillet3_2_piece_38:
        with BuildLine():
            CenterArc((FILLET3_R, -FILLET3_R), FILLET3_R, 89.99999999999977, 90.00000000000034)
            Line((1.216e-14, -FILLET3_R), (0, 0))
            Line((0, 0), (FILLET3_R, 0))
        make_face()
    extrude(amount=10, mode=Mode.SUBTRACT)
    with BuildSketch(Plane(origin=(-5.000000000000001, 17.136053176339928, -109.78763549542214), x_dir=(0, 0.08715574274766076, 0.9961946980917453), z_dir=(1, 0, 0))) as fillet3_2_piece_39:
        with BuildLine():
            CenterArc((FILLET3_R, -FILLET3_R), FILLET3_R, 90.00000000000037, 89.99999999999883)
            Line((2.61e-15, -FILLET3_R), (0, 0))
            Line((0, 0), (FILLET3_R, 0))
        make_face()
    extrude(amount=10, mode=Mode.SUBTRACT)
    with BuildSketch(Plane(origin=(-10, 19.564221286261706, -104.98097349045874), x_dir=(1, 0, 0), z_dir=(0, 0.08715574274765844, 0.9961946980917455))) as fillet3_2_piece_40:
        with BuildLine():
            CenterArc((FILLET3_R, -FILLET3_R), FILLET3_R, 90, 90)
            Line((0, -FILLET3_R), (0, 0))
            Line((0, 0), (FILLET3_R, 0))
        make_face()
    extrude(amount=4.978169528545766, mode=Mode.SUBTRACT)
    with BuildSketch(Plane(origin=(10, 19.564221286261706, -104.98097349045874), x_dir=(0, -0.9961946980917454, 0.08715574274765843), z_dir=(0, 0.08715574274765844, 0.9961946980917455))) as fillet3_2_piece_41:
        with BuildLine():
            CenterArc((FILLET3_R, -FILLET3_R), FILLET3_R, 90, 90)
            Line((0, -FILLET3_R), (0, 0))
            Line((0, 0), (FILLET3_R, 0))
        make_face()
    extrude(amount=4.978169528545751, mode=Mode.SUBTRACT)
    with BuildSketch(Plane(origin=(5.000000000000001, 19.564221286261706, -104.98097349045874), x_dir=(1, 0, 0), z_dir=(0, 0.08715574274766183, 0.9961946980917452))) as fillet3_2_piece_42:
        with BuildLine():
            CenterArc((4.999999999999999 - FILLET3_R, -FILLET3_R), FILLET3_R, 0, 90)
            Line((4.999999999999999 - FILLET3_R, -3.54e-15), (4.999999999999999, 0))
            Line((4.999999999999999, 0), (4.999999999999999, -FILLET3_R))
        make_face()
    revolve(axis=Axis((5.000000000000001, 19.564221286261706, -104.98097349045874), (0, 0.9961946980917452, -0.08715574274766183)), revolution_arc=90, mode=Mode.SUBTRACT)
    with BuildSketch(Plane(origin=(-5.000000000000001, 19.564221286261706, -104.98097349045874), x_dir=(0, -0.08715574274766175, -0.9961946980917453), z_dir=(1, 2e-17, 1.8e-16))) as fillet3_2_piece_43:
        with BuildLine():
            CenterArc((4.999999999999997 - FILLET3_R, -FILLET3_R), FILLET3_R, 359.9999999999984, 90.00000000000205)
            Line((4.999999999999987, -FILLET3_R), (4.999999999999997, -3e-17))
            Line((4.999999999999997, -3e-17), (4.999999999999997 - FILLET3_R, 1.591e-14))
        make_face()
    revolve(axis=Axis((-5.000000000000001, 19.564221286261706, -104.98097349045874), (0, 0.9961946980917452, -0.08715574274766183)), revolution_arc=90, mode=Mode.SUBTRACT)
    with BuildSketch(Plane(origin=(5.000000000000001, 17.57183189007822, -104.80666200496341), x_dir=(1, 0, 0), z_dir=(0, 0.08715574274766183, 0.9961946980917452))) as fillet3_2_piece_44:
        with BuildLine():
            CenterArc((4.999999999999999 - FILLET3_R, FILLET3_R), FILLET3_R, 270, 90)
            Line((4.999999999999999, FILLET3_R), (4.999999999999999, 0))
            Line((4.999999999999999, 0), (4.999999999999999 - FILLET3_R, -1.24e-15))
        make_face()
    revolve(axis=Axis((5.000000000000001, 17.57183189007822, -104.80666200496341), (0, 0.9961946980917452, -0.08715574274766183)), revolution_arc=90, mode=Mode.SUBTRACT)
    with BuildSketch(Plane(origin=(-5.000000000000001, 17.57183189007822, -104.80666200496341), x_dir=(0, -0.08715574274766175, -0.9961946980917453), z_dir=(1, 2e-17, 1.8e-16))) as fillet3_2_piece_45:
        with BuildLine():
            CenterArc((4.999999999999997 - FILLET3_R, FILLET3_R), FILLET3_R, 270.0000000000004, 89.99999999999666)
            Line((4.9999999999999805, FILLET3_R), (4.999999999999997, -3e-17))
            Line((4.999999999999997, -3e-17), (4.999999999999997 - FILLET3_R, 1.715e-14))
        make_face()
    revolve(axis=Axis((-5.000000000000001, 17.57183189007822, -104.80666200496341), (0, 0.9961946980917452, -0.08715574274766183)), revolution_arc=90, mode=Mode.SUBTRACT)
    with BuildSketch(Plane(origin=(10, 17.50348471228664, -99.85101719903234), x_dir=(0, 0.996194698091746, -0.08715574274765434), z_dir=(0, -0.08715574274765434, -0.996194698091746))) as fillet3_2_piece_46:
        with BuildLine():
            CenterArc((0.5000000000000016 + FILLET3_R, -FILLET3_R), FILLET3_R, 90, 90)
            Line((0.4999999999999993, -FILLET3_R), (0.5000000000000016, 0))
            Line((0.5000000000000016, 0), (0.5000000000000016 + FILLET3_R, 0))
        make_face()
    revolve(axis=Axis((10, 17.50348471228664, -99.85101719903234), (1, 0, 0)), revolution_arc=15.752560883569192, mode=Mode.SUBTRACT)
    with BuildSketch(Plane(origin=(-10, 17.50348471228664, -99.85101719903234), x_dir=(0, 0.996194698091746, -0.08715574274765434), z_dir=(0, -0.08715574274765434, -0.996194698091746))) as fillet3_2_piece_47:
        with BuildLine():
            CenterArc((0.5000000000000016 + FILLET3_R, FILLET3_R), FILLET3_R, 180, 90.00000000000028)
            Line((0.5000000000000016 + FILLET3_R, 0), (0.5000000000000016, 0))
            Line((0.5000000000000016, 0), (0.4999999999999993, FILLET3_R))
        make_face()
    revolve(axis=Axis((-10, 17.50348471228664, -99.85101719903234), (1, 0, 0)), revolution_arc=15.752560883569192, mode=Mode.SUBTRACT)

    # Sketch3 → Cut-Extrude2 (cut, through all)
    with BuildSketch(Plane(origin=(0, 2.9e-16, -4.811779672099927), x_dir=(-1, 0, 0), z_dir=(0, 1.2e-16, -1))):
        with Locations(Location((-5.9999999999999485, 10, 0), (0, 0, 90))):
            Circle(SKETCH3_R)
        with Locations(Location((6.000000000000052, 10.000000000000002, 0), (0, 0, 90))):
            Circle(SKETCH3_R)
    extrude(amount=-CUT_EXTRUDE2_DEPTH, mode=Mode.SUBTRACT)

    # Sketch3<3> → Cut-Extrude3 (cut)
    # profile 1 of 2: a face of its own
    with BuildSketch(Plane(origin=(0, 2.9e-16, -4.811779672099927), x_dir=(-1, 0, 0), z_dir=(0, 1.2e-16, -1))):
        Polygon((-8.999999999999945, 8.267949192431123), (-5.999999999999947, 6.5358983848622465), (-2.999999999999947, 8.267949192431123), (-2.9999999999999463, 11.732050807568875), (-5.999999999999947, 13.464101615137752), (-8.999999999999945, 11.732050807568873), align=None)
        with Locations(Location((-5.9999999999999485, 10, 0), (0, 0, 90))):
            Circle(SKETCH3_3_R, mode=Mode.SUBTRACT)
    # profile 2 of 2: a face of its own
    with BuildSketch(Plane(origin=(0, 2.9e-16, -4.811779672099927), x_dir=(-1, 0, 0), z_dir=(0, 1.2e-16, -1))):
        Polygon((6.000000000000052, 6.535898384862248), (9.000000000000053, 8.267949192431127), (9.000000000000053, 11.73205080756888), (6.0000000000000515, 13.464101615137757), (3.000000000000053, 11.732050807568875), (3.0000000000000537, 8.267949192431125), align=None)
        with Locations(Location((6.000000000000052, 10.000000000000002, 0), (0, 0, 90))):
            Circle(SKETCH3_3_R, mode=Mode.SUBTRACT)
    extrude(amount=-CUT_EXTRUDE3_DEPTH, mode=Mode.SUBTRACT)


solid = part.part
